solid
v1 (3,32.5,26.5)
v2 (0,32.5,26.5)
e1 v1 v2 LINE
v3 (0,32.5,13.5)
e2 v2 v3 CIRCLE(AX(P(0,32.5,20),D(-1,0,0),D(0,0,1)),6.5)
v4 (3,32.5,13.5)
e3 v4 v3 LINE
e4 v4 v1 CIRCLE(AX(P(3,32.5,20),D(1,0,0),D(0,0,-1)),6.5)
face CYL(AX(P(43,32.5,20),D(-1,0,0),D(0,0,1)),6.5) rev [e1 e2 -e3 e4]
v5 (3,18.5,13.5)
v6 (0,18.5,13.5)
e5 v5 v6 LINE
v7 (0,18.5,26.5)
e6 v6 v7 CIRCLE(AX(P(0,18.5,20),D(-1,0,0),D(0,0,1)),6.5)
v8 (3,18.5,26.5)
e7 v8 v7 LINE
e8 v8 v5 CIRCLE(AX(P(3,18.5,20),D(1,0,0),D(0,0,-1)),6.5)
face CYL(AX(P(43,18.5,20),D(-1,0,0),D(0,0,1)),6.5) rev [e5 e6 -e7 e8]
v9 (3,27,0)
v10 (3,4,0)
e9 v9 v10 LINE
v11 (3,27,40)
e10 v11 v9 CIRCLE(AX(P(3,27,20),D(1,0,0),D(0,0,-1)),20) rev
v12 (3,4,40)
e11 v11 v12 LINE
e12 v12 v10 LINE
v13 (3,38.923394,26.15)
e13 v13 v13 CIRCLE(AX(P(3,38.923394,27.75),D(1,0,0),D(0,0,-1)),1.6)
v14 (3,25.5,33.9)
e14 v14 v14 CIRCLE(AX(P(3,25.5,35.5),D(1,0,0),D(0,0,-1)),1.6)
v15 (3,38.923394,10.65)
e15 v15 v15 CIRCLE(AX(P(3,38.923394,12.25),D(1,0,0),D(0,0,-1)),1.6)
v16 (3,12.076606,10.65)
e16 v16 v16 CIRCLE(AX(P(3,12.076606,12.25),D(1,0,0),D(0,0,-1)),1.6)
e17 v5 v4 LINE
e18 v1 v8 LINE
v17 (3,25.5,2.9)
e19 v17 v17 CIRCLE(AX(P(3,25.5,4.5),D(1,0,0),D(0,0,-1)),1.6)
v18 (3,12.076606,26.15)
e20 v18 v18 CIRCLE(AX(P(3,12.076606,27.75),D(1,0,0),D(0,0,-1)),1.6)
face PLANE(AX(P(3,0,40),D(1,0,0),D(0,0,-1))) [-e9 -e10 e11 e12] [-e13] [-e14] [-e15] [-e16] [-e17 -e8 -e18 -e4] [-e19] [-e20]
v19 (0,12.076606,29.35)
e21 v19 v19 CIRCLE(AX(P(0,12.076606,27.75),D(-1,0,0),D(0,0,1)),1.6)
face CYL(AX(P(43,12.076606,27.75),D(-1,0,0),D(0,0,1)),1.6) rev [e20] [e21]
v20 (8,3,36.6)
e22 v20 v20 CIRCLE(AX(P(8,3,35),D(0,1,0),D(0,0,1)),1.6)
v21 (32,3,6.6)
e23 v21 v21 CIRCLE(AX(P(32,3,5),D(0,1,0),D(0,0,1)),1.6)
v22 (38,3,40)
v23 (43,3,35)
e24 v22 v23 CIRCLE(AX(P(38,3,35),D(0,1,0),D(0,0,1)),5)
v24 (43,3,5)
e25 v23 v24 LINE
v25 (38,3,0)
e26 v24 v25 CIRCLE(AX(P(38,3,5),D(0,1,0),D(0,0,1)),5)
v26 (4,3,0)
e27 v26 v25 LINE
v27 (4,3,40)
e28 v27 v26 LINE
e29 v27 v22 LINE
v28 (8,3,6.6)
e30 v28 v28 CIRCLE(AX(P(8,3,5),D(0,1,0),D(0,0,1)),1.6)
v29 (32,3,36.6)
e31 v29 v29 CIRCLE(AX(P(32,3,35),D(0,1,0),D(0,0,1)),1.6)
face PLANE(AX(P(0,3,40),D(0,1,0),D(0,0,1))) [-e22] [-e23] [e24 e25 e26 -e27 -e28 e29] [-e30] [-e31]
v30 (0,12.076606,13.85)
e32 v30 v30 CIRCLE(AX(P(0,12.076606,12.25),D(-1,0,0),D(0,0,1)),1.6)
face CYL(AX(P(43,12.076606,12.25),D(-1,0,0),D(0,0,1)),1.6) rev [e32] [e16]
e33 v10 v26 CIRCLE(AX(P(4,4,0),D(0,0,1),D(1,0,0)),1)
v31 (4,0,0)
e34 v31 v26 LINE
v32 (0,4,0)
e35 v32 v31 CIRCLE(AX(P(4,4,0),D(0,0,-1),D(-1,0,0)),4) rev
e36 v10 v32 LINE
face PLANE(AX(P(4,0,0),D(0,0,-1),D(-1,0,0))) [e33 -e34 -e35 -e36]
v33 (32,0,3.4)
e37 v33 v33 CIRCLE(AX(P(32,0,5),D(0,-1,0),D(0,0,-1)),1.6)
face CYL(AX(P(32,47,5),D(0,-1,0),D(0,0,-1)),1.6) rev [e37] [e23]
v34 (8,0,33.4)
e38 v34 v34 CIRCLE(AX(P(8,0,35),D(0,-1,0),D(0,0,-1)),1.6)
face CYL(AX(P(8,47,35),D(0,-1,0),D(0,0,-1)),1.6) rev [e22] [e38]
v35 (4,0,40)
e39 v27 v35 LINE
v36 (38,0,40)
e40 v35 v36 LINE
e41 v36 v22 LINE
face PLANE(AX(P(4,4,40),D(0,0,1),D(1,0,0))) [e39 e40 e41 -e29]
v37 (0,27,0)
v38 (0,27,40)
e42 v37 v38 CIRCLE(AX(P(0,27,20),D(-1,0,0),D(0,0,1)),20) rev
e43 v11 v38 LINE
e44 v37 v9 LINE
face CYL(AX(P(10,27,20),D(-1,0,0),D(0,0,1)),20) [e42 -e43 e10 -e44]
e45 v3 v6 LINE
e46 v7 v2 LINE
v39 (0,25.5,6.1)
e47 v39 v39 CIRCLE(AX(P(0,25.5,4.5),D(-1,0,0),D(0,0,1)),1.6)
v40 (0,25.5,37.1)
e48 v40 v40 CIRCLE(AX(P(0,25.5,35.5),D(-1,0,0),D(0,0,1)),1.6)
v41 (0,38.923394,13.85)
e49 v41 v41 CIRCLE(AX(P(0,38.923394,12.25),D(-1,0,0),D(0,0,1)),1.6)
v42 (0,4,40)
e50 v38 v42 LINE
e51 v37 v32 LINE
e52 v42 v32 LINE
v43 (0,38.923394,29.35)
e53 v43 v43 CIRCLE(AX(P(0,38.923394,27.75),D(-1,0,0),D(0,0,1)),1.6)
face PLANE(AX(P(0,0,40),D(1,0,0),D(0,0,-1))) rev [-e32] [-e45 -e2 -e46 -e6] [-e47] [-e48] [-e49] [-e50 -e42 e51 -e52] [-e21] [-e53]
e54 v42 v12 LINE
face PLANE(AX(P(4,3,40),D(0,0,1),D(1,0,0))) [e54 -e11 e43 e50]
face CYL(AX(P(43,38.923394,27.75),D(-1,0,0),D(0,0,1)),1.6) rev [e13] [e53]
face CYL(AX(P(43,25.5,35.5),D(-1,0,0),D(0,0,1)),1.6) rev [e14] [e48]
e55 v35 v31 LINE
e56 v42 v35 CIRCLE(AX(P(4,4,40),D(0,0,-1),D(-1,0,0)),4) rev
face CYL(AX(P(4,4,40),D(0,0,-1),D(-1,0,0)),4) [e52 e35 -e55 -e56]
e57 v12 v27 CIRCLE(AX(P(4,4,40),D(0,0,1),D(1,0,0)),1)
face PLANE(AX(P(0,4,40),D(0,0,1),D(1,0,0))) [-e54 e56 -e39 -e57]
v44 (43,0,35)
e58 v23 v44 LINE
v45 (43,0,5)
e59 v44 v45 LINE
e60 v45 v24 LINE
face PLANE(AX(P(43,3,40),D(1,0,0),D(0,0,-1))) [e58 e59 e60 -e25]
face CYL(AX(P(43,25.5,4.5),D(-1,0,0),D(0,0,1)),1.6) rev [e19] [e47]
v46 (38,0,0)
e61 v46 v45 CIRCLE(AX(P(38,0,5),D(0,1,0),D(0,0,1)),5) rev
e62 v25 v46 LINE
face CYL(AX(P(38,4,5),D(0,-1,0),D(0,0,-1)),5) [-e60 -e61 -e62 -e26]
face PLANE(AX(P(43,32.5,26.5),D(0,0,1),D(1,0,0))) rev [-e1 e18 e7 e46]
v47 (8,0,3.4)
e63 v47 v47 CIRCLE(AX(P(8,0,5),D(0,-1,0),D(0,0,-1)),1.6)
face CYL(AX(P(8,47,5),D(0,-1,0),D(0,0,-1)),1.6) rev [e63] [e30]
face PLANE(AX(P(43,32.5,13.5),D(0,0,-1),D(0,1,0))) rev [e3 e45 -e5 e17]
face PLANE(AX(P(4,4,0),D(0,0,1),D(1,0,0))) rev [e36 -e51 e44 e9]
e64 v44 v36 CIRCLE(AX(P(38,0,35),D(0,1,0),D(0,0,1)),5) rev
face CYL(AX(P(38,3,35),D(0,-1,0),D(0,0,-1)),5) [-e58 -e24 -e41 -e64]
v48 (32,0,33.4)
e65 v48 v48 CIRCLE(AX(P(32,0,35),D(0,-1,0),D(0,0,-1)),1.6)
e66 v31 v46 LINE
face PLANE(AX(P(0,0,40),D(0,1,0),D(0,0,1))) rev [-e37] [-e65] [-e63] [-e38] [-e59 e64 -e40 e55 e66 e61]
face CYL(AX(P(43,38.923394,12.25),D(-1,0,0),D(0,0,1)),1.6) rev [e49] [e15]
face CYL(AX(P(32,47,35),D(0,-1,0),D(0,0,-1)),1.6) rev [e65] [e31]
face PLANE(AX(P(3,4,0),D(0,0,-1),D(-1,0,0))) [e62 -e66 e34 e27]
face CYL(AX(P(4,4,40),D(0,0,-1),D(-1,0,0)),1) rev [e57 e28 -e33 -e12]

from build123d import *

# Parameters (mm, degrees)
SM_BASE_FLANGE_1_DEPTH      = 40
CUT_EXTRUDE_3_DEPTH         = 10
CUT_EXTRUDE_1_DEPTH         = 76.219678276
SKETCH_7_R                  = 1.6
CUT_EXTRUDE_2_DEPTH         = 76.219678276
SKETCH_9_R                  = 1.6
CUT_EXTRUDE_4_DEPTH         = 76.219678276
PATTERN_LINEAR_1_COUNT      = 2
PATTERN_LINEAR_1_PITCH      = 30
PATTERN_LINEAR_1_COUNT_DIR2 = 2
PATTERN_LINEAR_1_PITCH_DIR2 = 24
FILLET_1_R                  = 5


# Sheet-metal steps are written as plain solids
with BuildPart() as part:
    # Sketch 1 → 基材-凸緣1 (new body)
    with BuildSketch(Plane.XY):
        with BuildLine():
            Line((43, 0), (4, 0))
            ThreePointArc((4, 0), (1.171572875, 1.171572875), (0, 4))
            Line((0, 4), (0, 47))
            Line((0, 47), (3, 47))
            Line((3, 47), (3, 4))
            ThreePointArc((3, 4), (3.292893219, 3.292893219), (4, 3))
            Line((4, 3), (43, 3))
            Line((43, 3), (43, 0))
        make_face()
    extrude(amount=SM_BASE_FLANGE_1_DEPTH)

    # 草圖8 → 除料-伸長3 (cut)
    with BuildSketch(Plane.ZY):
        with BuildLine():
            Line((0, 47), (0, 27))
            ThreePointArc((0, 27), (5.857864376, 41.142135624), (20, 47))
            Line((20, 47), (0, 47))
        make_face()
        with BuildLine():
            ThreePointArc((20, 47), (34.142135624, 41.142135624), (40, 27))
            Line((40, 27), (40, 47))
            Line((40, 47), (20, 47))
        make_face()
    extrude(amount=-CUT_EXTRUDE_3_DEPTH, mode=Mode.SUBTRACT)

    # 草圖6 → 除料-伸長1 (cut, through all)
    with BuildSketch(Plane.ZY):
        with BuildLine():
            Line((26.5, 32.5), (26.5, 18.5))
            ThreePointArc((26.5, 18.5), (20, 12), (13.5, 18.5))
            Line((13.5, 18.5), (13.5, 32.5))
            ThreePointArc((13.5, 32.5), (20, 39), (26.5, 32.5))
        make_face()
    extrude(amount=-CUT_EXTRUDE_1_DEPTH, mode=Mode.SUBTRACT)

    # 草圖7 → 除料-伸長2 (cut, through all)
    with BuildSketch(Plane.ZY):
        with Locations((4.5, 25.5)):
            Circle(SKETCH_7_R)
        with Locations((12.25, 12.076606241)):
            Circle(SKETCH_7_R)
        with Locations((27.75, 12.076606241)):
            Circle(SKETCH_7_R)
        with Locations((35.5, 25.5)):
            Circle(SKETCH_7_R)
        with Locations((27.75, 38.923393759)):
            Circle(SKETCH_7_R)
        with Locations((12.25, 38.923393759)):
            Circle(SKETCH_7_R)
    extrude(amount=-CUT_EXTRUDE_2_DEPTH, mode=Mode.SUBTRACT)

    # 草圖9 → 除料-伸長4 (cut, through all)
    with BuildSketch(Plane.XZ):
        with Locations(Location((32, 35, 0), (0, 0, 270))):
            Circle(SKETCH_9_R)
    cut_extrude_4 = extrude(amount=-CUT_EXTRUDE_4_DEPTH, mode=Mode.SUBTRACT)

    # 直線複製排列1: Cut-Extrude 4 2 × 2
    with Locations(*[(-j * PATTERN_LINEAR_1_PITCH_DIR2, 0, -i * PATTERN_LINEAR_1_PITCH) for i in range(PATTERN_LINEAR_1_COUNT) for j in range(PATTERN_LINEAR_1_COUNT_DIR2) if (i, j) != (0, 0)]):
        add(cut_extrude_4, mode=Mode.SUBTRACT)

    # 圓角1
    fillet_1_edges = [part.edges().sort_by_distance(p)[0] for p in [
        (43, 1.5, 40),
        (43, 1.5, 0),
    ]]
    fillet(fillet_1_edges, radius=FILLET_1_R)


solid = part.part
